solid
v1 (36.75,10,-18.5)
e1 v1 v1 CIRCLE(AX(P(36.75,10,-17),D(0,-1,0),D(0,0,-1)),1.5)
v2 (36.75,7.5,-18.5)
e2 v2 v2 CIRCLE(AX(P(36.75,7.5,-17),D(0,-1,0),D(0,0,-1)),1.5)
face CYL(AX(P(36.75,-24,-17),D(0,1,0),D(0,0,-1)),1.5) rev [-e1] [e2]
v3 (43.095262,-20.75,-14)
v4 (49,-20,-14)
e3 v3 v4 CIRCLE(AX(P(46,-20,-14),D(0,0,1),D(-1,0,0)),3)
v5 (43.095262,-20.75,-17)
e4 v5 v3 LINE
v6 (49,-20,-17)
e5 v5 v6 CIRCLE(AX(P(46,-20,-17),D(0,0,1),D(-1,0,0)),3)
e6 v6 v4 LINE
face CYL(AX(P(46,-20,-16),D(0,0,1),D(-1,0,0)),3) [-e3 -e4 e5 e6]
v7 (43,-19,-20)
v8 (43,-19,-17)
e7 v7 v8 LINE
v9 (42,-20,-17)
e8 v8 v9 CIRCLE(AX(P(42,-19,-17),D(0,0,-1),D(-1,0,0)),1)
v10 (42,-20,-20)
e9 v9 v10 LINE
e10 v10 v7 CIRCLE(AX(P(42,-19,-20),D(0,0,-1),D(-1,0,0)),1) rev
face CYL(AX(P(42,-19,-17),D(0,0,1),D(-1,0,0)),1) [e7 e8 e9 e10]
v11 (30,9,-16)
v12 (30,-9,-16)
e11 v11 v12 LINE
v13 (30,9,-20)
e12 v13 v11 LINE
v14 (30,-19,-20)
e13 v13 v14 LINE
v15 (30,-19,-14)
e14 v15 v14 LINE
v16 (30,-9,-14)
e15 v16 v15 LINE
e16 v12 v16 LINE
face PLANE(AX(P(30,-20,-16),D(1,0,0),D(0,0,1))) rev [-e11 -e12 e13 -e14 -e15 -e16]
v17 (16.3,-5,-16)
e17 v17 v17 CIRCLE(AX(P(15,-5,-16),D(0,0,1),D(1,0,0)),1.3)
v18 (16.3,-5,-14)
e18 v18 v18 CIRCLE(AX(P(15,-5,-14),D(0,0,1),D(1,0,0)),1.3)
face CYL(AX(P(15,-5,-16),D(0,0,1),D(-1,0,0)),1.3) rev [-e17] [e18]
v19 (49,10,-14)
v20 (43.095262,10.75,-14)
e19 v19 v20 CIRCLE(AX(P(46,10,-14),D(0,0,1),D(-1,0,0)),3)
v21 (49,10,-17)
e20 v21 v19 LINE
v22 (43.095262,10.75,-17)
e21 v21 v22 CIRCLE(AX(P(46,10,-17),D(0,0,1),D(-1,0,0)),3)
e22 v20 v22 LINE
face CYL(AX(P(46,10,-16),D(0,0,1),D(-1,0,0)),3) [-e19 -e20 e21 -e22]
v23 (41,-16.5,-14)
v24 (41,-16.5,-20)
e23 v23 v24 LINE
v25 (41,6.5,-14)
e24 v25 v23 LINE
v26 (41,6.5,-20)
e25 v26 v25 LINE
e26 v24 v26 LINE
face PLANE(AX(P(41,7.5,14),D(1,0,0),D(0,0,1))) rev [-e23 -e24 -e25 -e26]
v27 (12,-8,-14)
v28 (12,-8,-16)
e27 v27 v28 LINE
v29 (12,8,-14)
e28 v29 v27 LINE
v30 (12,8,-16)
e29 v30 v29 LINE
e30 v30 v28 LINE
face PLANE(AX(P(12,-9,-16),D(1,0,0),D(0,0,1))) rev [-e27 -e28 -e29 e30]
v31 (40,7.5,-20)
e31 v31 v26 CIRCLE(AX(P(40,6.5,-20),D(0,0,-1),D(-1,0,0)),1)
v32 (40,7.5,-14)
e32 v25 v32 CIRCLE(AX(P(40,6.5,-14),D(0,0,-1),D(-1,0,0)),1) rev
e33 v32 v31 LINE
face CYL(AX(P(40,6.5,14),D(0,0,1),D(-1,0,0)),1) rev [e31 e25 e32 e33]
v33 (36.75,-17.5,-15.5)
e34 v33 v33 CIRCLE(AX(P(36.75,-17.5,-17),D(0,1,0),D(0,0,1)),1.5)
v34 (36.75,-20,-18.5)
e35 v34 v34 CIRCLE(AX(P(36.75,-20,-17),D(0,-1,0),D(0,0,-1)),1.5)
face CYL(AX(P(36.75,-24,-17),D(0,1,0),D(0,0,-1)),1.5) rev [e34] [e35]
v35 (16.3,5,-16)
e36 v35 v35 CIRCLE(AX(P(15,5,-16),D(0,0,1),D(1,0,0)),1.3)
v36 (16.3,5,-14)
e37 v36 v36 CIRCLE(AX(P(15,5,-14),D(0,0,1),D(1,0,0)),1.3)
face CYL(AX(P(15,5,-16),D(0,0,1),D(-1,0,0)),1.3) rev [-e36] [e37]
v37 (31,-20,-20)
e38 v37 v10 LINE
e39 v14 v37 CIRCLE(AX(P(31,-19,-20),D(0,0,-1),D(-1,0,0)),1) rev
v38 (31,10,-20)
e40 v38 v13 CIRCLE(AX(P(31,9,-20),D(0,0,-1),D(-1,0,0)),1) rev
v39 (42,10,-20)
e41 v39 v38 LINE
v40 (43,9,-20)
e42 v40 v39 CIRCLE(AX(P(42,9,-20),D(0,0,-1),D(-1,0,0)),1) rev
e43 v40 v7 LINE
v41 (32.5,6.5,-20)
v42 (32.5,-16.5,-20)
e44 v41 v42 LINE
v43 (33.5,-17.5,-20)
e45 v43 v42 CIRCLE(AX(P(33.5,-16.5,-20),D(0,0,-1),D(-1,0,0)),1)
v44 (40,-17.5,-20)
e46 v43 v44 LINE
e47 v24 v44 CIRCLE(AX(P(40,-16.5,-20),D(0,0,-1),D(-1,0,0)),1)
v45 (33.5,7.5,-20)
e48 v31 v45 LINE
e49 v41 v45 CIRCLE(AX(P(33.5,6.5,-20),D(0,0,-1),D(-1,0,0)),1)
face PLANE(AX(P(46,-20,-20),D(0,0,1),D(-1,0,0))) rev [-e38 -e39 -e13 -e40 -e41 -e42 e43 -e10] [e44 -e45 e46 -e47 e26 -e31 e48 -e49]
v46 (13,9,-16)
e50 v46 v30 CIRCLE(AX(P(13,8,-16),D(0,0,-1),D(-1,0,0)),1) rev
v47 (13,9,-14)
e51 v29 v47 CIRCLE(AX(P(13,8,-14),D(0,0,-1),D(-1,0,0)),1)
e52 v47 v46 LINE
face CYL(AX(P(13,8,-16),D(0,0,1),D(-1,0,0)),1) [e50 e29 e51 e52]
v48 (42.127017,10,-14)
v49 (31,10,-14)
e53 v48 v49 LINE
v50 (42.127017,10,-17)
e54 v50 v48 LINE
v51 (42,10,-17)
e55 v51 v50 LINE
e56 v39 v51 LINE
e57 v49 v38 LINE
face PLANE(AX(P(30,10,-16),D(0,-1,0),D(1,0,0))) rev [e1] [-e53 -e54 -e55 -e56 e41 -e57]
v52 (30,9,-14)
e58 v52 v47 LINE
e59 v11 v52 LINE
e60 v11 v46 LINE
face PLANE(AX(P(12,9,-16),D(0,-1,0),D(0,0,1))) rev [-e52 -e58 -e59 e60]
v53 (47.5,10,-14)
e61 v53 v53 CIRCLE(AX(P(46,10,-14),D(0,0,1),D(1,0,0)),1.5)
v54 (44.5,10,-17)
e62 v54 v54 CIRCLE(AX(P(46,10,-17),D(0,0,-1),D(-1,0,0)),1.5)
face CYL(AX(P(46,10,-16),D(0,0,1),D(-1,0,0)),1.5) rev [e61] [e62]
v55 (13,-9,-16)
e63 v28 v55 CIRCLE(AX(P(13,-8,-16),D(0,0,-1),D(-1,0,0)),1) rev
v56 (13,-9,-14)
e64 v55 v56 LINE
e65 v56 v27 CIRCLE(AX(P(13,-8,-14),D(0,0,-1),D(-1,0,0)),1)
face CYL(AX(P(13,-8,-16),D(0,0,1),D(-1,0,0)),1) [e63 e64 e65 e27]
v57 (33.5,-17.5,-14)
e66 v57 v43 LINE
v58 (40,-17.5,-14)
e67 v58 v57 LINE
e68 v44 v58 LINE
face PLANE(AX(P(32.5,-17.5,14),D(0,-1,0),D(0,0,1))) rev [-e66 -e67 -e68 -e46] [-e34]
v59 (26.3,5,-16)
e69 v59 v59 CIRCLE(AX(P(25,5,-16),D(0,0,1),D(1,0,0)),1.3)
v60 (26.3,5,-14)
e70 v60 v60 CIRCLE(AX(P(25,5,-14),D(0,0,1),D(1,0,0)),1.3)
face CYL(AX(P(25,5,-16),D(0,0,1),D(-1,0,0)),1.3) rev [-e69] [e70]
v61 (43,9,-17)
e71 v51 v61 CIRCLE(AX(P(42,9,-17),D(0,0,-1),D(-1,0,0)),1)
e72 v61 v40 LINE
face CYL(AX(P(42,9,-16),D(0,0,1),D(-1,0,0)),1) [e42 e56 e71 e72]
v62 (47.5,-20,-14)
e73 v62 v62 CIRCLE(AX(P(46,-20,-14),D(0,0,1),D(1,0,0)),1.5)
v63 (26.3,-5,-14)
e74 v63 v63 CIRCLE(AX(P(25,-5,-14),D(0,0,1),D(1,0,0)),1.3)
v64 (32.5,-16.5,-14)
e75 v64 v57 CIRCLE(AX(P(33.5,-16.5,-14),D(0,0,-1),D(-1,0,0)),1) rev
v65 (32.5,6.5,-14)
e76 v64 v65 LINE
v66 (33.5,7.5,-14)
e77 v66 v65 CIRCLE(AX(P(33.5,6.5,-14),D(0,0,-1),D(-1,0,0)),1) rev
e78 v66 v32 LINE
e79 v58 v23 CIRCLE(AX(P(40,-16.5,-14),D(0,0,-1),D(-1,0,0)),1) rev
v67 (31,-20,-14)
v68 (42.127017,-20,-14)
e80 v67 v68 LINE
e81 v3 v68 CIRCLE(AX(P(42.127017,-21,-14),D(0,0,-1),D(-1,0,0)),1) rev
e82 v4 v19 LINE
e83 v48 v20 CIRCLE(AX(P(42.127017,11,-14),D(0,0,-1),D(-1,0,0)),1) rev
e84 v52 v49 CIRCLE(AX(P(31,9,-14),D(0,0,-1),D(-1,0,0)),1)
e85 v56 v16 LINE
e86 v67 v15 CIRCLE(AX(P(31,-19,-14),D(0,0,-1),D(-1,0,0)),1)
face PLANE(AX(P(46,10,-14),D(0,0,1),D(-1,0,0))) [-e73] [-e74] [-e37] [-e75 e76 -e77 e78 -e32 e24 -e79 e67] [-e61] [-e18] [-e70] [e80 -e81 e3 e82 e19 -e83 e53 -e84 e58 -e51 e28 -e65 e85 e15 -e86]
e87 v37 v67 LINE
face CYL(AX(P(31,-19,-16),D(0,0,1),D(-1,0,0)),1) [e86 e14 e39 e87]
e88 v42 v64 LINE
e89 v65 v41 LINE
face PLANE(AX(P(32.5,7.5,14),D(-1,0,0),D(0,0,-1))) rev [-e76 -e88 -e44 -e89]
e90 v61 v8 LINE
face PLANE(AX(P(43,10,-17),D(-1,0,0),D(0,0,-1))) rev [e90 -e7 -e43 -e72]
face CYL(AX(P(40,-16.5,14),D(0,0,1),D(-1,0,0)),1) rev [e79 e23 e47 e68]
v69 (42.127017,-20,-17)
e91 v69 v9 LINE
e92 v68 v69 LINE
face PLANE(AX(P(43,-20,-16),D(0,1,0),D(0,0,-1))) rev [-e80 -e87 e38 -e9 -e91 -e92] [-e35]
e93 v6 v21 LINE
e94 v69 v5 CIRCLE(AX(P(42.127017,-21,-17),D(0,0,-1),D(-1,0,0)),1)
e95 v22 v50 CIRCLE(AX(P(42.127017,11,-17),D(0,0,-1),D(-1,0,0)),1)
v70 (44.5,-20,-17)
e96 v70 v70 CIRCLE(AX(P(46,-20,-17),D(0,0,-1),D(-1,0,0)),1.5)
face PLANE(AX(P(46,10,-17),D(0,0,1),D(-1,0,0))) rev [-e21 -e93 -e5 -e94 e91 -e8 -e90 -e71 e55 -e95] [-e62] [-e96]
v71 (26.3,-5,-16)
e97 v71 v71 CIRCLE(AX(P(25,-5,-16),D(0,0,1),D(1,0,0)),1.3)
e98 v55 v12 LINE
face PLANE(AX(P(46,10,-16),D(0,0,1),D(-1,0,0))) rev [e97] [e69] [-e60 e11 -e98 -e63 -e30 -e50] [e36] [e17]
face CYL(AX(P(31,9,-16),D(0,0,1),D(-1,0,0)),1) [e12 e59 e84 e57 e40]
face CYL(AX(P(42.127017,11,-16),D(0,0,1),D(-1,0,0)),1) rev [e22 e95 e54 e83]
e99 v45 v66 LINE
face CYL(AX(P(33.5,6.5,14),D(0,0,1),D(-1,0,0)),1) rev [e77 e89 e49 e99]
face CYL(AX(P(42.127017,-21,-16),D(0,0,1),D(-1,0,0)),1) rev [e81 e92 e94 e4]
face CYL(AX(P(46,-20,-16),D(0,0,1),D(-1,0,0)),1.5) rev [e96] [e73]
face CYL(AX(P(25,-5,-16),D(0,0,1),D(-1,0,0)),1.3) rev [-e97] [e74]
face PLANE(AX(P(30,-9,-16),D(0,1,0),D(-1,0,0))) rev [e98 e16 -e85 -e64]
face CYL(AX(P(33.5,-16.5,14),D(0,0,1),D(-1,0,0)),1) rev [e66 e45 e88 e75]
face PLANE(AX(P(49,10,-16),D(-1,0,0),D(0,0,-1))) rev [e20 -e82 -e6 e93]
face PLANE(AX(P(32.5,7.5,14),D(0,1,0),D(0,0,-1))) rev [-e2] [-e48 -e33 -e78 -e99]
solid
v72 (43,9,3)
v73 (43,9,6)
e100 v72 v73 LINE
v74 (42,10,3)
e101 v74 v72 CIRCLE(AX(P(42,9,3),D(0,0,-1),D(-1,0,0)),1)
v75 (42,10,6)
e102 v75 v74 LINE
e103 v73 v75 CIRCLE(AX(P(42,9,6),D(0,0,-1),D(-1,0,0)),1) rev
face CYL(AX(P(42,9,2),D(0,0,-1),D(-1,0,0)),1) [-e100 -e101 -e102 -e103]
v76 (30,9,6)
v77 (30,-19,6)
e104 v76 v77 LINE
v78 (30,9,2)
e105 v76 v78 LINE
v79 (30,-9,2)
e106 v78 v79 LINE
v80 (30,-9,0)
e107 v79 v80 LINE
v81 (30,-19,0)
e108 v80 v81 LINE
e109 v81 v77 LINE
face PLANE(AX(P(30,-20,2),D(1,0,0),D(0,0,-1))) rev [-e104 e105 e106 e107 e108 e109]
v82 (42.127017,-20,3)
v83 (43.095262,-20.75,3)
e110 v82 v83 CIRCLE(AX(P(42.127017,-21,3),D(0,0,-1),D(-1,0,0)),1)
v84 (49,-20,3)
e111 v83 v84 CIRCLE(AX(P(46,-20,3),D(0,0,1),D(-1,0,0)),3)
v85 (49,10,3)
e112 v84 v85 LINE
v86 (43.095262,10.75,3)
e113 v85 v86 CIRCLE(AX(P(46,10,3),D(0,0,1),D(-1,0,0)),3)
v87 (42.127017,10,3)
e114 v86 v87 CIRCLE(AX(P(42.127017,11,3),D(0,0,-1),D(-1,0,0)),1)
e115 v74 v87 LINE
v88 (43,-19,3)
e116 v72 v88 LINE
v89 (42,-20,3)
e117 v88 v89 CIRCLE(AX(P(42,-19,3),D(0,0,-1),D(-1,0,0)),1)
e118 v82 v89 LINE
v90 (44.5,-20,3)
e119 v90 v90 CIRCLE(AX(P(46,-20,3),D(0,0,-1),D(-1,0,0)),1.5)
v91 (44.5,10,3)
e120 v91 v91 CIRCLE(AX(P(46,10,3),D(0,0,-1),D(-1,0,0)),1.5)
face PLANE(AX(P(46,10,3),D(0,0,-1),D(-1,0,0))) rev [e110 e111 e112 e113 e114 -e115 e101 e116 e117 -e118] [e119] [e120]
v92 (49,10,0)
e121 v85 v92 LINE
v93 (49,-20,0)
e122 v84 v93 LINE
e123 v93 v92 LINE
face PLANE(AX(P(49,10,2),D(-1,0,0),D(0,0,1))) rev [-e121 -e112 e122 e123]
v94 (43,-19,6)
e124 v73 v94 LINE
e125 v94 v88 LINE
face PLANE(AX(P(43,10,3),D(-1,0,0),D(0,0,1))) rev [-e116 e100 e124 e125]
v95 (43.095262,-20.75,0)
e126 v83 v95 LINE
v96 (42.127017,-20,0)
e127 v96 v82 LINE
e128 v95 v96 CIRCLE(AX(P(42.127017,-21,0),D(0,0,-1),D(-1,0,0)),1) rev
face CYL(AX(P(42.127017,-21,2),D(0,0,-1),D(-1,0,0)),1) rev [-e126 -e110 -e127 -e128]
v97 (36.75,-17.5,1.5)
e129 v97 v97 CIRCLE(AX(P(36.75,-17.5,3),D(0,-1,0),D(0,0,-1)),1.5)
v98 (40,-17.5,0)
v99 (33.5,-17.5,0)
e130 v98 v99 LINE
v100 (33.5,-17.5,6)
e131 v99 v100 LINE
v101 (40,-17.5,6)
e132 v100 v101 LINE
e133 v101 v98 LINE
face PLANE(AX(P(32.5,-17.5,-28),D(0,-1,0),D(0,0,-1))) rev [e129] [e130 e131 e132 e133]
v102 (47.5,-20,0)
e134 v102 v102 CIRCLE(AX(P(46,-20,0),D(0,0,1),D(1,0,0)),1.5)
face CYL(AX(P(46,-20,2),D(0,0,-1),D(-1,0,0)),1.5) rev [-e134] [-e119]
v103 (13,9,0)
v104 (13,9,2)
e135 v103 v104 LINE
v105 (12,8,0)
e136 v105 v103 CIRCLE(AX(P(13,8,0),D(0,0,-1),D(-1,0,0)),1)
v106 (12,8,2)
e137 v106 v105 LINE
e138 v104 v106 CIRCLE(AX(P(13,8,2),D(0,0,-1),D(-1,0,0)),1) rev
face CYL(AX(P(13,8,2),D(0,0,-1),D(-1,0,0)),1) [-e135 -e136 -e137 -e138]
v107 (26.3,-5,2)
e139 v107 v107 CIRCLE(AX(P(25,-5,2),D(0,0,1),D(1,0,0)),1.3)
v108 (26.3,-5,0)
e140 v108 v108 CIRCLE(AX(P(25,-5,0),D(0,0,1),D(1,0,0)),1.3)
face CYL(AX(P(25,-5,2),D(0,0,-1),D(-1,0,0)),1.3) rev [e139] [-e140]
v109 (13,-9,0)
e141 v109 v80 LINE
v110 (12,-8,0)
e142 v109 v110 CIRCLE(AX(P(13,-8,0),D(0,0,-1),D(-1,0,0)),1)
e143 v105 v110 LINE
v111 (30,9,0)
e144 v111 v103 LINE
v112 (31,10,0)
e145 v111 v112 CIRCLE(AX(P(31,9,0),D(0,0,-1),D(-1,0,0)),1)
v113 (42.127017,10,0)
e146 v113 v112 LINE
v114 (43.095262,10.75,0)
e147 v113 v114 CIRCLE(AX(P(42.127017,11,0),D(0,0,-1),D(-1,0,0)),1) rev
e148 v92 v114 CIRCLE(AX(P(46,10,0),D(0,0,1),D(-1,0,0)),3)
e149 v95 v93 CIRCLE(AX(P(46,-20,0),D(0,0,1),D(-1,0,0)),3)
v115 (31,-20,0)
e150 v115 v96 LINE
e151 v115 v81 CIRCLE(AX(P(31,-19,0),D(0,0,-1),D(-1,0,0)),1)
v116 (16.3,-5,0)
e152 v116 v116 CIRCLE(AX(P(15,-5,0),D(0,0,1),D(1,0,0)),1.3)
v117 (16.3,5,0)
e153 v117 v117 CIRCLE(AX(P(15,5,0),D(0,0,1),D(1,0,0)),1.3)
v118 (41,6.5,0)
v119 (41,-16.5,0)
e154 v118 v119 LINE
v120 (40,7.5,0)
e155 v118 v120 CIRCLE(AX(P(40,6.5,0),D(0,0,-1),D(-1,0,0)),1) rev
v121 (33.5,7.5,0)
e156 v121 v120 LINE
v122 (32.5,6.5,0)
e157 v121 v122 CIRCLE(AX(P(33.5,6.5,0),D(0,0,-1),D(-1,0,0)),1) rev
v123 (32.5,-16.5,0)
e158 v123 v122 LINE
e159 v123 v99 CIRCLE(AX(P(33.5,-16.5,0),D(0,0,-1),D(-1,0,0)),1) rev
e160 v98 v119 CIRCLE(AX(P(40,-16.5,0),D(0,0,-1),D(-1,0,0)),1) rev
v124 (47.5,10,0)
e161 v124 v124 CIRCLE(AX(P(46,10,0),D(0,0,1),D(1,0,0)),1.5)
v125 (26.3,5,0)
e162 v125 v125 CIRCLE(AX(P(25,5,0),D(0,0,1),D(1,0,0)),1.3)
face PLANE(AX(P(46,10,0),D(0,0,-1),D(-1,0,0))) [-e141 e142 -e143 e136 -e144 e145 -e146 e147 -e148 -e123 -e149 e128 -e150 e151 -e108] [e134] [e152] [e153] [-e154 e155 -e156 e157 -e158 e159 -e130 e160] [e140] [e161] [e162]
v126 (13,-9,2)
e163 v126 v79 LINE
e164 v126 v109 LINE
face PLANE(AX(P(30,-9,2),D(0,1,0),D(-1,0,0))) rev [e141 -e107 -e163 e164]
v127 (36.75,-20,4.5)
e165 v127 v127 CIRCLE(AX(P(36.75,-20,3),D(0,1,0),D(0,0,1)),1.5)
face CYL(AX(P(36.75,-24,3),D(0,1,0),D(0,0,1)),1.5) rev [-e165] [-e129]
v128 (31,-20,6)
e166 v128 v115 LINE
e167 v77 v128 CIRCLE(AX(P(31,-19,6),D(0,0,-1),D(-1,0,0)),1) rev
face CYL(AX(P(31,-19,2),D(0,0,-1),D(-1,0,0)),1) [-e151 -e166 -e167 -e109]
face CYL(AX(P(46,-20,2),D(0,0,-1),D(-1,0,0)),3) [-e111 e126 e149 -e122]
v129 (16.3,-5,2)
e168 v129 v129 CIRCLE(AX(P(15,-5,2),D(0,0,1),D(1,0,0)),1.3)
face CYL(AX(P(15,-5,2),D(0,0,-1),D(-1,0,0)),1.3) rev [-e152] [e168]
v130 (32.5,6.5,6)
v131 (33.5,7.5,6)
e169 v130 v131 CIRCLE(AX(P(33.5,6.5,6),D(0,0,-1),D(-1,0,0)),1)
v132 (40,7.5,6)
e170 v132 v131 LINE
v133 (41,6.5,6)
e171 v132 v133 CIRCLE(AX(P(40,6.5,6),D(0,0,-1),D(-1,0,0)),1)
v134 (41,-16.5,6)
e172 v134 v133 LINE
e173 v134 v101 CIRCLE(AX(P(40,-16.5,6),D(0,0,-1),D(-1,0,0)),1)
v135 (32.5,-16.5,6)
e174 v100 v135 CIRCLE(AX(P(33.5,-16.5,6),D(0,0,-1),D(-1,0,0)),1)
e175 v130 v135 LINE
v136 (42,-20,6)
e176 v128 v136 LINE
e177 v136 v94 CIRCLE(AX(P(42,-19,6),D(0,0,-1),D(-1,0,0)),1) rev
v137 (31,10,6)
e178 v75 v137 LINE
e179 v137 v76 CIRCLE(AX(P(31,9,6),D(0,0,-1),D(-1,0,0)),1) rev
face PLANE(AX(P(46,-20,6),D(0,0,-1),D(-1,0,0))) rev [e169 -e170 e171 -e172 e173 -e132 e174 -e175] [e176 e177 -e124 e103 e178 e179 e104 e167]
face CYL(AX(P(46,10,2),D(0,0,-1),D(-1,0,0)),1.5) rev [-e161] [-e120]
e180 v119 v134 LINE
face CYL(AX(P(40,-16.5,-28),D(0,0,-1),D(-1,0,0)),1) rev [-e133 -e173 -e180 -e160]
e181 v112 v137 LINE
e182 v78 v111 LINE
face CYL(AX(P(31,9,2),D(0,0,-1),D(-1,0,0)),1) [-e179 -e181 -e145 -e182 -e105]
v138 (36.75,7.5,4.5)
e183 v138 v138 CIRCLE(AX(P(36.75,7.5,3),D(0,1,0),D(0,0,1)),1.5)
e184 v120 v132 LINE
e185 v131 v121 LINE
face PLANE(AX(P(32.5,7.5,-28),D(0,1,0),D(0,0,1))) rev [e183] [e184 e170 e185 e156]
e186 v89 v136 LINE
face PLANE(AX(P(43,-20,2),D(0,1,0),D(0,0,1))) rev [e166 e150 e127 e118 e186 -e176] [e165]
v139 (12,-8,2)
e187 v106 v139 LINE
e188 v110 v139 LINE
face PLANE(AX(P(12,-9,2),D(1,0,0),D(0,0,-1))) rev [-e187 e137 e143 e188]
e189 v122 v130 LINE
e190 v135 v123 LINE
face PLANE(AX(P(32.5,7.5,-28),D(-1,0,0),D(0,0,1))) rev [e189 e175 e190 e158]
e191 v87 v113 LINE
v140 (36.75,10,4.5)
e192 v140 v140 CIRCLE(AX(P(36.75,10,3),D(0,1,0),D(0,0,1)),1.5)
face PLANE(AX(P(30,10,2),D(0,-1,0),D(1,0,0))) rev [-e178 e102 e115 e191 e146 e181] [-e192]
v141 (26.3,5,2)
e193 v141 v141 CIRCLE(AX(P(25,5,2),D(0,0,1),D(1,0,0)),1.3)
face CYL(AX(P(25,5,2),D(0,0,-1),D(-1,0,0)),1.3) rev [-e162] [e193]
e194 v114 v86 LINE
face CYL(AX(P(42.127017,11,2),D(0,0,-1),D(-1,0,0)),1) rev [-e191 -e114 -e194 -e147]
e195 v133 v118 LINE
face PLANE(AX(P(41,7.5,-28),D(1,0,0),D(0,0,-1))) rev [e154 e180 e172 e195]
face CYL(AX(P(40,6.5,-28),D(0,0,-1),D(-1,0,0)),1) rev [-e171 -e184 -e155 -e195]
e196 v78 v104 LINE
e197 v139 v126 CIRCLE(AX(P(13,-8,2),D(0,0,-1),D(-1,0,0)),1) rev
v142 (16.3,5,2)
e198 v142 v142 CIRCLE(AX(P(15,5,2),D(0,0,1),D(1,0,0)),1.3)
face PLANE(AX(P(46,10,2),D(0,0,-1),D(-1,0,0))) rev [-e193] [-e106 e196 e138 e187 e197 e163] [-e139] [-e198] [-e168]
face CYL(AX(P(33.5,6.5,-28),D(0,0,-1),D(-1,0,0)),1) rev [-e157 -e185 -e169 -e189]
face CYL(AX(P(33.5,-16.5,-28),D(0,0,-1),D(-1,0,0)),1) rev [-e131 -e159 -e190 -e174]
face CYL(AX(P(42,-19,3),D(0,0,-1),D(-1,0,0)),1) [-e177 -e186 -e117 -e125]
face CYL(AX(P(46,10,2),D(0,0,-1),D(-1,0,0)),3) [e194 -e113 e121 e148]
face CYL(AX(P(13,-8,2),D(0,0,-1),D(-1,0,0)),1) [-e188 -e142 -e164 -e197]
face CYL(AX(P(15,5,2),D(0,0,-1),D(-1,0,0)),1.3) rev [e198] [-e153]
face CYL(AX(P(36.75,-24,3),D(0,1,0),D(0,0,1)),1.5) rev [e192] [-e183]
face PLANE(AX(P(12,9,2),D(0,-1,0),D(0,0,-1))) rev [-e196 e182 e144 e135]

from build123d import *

# Parameters (mm, degrees)
SKETCH_2_R          = 1.5
SKETCH_2_R_2        = 1.3
EXTRUDE_1_DEPTH     = 2
SKETCH_3_R          = 1.5
EXTRUDE_2_DEPTH     = 4
SKETCH_4_W          = 8.5
SKETCH_4_H          = 25
CUT_EXTRUDE_1_DEPTH = 34
SKETCH_7_R          = 1.5
CUT_EXTRUDE_2_DEPTH = 34
CUT_EXTRUDE_START   = -3
CUT_EXTRUDE_3_DEPTH = 3
FILLET_1_R          = 1
FILLET_2_R          = 1
FILLET_3_R          = 1


with BuildPart() as part:
    # 草图2 → 凸台-拉伸1 (new body)
    with BuildSketch(Plane.XY):
        with BuildLine():
            Line((49, 10), (49, -20))
            ThreePointArc((49, -20), (46, -23), (43, -20))
            Line((43, -20), (30, -20))
            Line((30, -20), (30, -9))
            Line((30, -9), (12, -9))
            Line((12, -9), (12, 9))
            Line((12, 9), (30, 9))
            Line((30, 9), (30, 10))
            Line((30, 10), (43, 10))
            ThreePointArc((43, 10), (46, 13), (49, 10))
        make_face()
        with Locations((46, 10)):
            Circle(SKETCH_2_R, mode=Mode.SUBTRACT)
        with Locations((46, -20)):
            Circle(SKETCH_2_R, mode=Mode.SUBTRACT)
        with Locations((25, 5)):
            Circle(SKETCH_2_R_2, mode=Mode.SUBTRACT)
        with Locations((25, -5)):
            Circle(SKETCH_2_R_2, mode=Mode.SUBTRACT)
        with Locations((15, 5)):
            Circle(SKETCH_2_R_2, mode=Mode.SUBTRACT)
        with Locations((15, -5)):
            Circle(SKETCH_2_R_2, mode=Mode.SUBTRACT)
    extrude(amount=EXTRUDE_1_DEPTH)

    # 草图3 → 凸台-拉伸2 (add)
    with BuildSketch(Plane.XY.offset(2)):
        with BuildLine():
            Line((30, -20), (30, 10))
            Line((30, 10), (43, 10))
            ThreePointArc((43, 10), (46, 13), (49, 10))
            Line((49, 10), (49, -20))
            ThreePointArc((49, -20), (46, -23), (43, -20))
            Line((43, -20), (30, -20))
        make_face()
        with Locations((46, 10)):
            Circle(SKETCH_3_R, mode=Mode.SUBTRACT)
        with Locations((46, -20)):
            Circle(SKETCH_3_R, mode=Mode.SUBTRACT)
    extrude(amount=EXTRUDE_2_DEPTH)

    # 草图4 → 切除-拉伸1 (cut)
    with BuildSketch(Plane.XY.offset(6)):
        with Locations((36.75, -5)):
            Rectangle(SKETCH_4_W, SKETCH_4_H)
    extrude(amount=-CUT_EXTRUDE_1_DEPTH, mode=Mode.SUBTRACT)

    # 草图7 → 切除-拉伸2 (cut)
    with BuildSketch(Plane(origin=(0, 10, 0), x_dir=(1, 0, 0), z_dir=(0, 1, 0))):
        with Locations(Location((36.75, -3, 0), (0, 0, 270))):
            Circle(SKETCH_7_R)
    extrude(amount=-CUT_EXTRUDE_2_DEPTH, mode=Mode.SUBTRACT)

    # 草图8 → 切除-拉伸3 (cut)
    with BuildSketch(Plane.XY.offset(6).offset(CUT_EXTRUDE_START)):
        with BuildLine():
            Line((43, 10), (43, -20))
            ThreePointArc((43, -20), (46, -23), (49, -20))
            Line((49, -20), (49, 10))
            ThreePointArc((49, 10), (46, 13), (43, 10))
        make_face()
    extrude(amount=CUT_EXTRUDE_3_DEPTH, mode=Mode.SUBTRACT)

    # 圆角1
    fillet_1_edges = [part.edges().sort_by_distance(p)[0] for p in [
        (43, -20, 4.5),
        (30, -20, 3),
        (12, -9, 1),
        (12, 9, 1),
        (30, 10, 3),
        (43, 10, 4.5),
    ]]
    fillet(fillet_1_edges, radius=FILLET_1_R - 0.0001)  # a hair under: the kernel refuses the full size

    # 圆角2
    fillet_2_edges = [part.edges().sort_by_distance(p)[0] for p in [
        (43, -20, 1.5),
        (43, 10, 1.5),
    ]]
    fillet(fillet_2_edges, radius=FILLET_2_R)

    # 圆角3
    fillet_3_edges = [part.edges().sort_by_distance(p)[0] for p in [
        (32.5, -17.5, 3),
        (32.5, 7.5, 3),
        (41, 7.5, 3),
        (41, -17.5, 3),
    ]]
    fillet(fillet_3_edges, radius=FILLET_3_R)


with BuildPart() as body_2:
    # 镜向2: mirrored copy
    add(part.part.mirror(Plane(origin=(0, 0, -7), x_dir=(1, 0, 0), z_dir=(0, 0, -1))))


solid = Compound([part.part, body_2.part])
